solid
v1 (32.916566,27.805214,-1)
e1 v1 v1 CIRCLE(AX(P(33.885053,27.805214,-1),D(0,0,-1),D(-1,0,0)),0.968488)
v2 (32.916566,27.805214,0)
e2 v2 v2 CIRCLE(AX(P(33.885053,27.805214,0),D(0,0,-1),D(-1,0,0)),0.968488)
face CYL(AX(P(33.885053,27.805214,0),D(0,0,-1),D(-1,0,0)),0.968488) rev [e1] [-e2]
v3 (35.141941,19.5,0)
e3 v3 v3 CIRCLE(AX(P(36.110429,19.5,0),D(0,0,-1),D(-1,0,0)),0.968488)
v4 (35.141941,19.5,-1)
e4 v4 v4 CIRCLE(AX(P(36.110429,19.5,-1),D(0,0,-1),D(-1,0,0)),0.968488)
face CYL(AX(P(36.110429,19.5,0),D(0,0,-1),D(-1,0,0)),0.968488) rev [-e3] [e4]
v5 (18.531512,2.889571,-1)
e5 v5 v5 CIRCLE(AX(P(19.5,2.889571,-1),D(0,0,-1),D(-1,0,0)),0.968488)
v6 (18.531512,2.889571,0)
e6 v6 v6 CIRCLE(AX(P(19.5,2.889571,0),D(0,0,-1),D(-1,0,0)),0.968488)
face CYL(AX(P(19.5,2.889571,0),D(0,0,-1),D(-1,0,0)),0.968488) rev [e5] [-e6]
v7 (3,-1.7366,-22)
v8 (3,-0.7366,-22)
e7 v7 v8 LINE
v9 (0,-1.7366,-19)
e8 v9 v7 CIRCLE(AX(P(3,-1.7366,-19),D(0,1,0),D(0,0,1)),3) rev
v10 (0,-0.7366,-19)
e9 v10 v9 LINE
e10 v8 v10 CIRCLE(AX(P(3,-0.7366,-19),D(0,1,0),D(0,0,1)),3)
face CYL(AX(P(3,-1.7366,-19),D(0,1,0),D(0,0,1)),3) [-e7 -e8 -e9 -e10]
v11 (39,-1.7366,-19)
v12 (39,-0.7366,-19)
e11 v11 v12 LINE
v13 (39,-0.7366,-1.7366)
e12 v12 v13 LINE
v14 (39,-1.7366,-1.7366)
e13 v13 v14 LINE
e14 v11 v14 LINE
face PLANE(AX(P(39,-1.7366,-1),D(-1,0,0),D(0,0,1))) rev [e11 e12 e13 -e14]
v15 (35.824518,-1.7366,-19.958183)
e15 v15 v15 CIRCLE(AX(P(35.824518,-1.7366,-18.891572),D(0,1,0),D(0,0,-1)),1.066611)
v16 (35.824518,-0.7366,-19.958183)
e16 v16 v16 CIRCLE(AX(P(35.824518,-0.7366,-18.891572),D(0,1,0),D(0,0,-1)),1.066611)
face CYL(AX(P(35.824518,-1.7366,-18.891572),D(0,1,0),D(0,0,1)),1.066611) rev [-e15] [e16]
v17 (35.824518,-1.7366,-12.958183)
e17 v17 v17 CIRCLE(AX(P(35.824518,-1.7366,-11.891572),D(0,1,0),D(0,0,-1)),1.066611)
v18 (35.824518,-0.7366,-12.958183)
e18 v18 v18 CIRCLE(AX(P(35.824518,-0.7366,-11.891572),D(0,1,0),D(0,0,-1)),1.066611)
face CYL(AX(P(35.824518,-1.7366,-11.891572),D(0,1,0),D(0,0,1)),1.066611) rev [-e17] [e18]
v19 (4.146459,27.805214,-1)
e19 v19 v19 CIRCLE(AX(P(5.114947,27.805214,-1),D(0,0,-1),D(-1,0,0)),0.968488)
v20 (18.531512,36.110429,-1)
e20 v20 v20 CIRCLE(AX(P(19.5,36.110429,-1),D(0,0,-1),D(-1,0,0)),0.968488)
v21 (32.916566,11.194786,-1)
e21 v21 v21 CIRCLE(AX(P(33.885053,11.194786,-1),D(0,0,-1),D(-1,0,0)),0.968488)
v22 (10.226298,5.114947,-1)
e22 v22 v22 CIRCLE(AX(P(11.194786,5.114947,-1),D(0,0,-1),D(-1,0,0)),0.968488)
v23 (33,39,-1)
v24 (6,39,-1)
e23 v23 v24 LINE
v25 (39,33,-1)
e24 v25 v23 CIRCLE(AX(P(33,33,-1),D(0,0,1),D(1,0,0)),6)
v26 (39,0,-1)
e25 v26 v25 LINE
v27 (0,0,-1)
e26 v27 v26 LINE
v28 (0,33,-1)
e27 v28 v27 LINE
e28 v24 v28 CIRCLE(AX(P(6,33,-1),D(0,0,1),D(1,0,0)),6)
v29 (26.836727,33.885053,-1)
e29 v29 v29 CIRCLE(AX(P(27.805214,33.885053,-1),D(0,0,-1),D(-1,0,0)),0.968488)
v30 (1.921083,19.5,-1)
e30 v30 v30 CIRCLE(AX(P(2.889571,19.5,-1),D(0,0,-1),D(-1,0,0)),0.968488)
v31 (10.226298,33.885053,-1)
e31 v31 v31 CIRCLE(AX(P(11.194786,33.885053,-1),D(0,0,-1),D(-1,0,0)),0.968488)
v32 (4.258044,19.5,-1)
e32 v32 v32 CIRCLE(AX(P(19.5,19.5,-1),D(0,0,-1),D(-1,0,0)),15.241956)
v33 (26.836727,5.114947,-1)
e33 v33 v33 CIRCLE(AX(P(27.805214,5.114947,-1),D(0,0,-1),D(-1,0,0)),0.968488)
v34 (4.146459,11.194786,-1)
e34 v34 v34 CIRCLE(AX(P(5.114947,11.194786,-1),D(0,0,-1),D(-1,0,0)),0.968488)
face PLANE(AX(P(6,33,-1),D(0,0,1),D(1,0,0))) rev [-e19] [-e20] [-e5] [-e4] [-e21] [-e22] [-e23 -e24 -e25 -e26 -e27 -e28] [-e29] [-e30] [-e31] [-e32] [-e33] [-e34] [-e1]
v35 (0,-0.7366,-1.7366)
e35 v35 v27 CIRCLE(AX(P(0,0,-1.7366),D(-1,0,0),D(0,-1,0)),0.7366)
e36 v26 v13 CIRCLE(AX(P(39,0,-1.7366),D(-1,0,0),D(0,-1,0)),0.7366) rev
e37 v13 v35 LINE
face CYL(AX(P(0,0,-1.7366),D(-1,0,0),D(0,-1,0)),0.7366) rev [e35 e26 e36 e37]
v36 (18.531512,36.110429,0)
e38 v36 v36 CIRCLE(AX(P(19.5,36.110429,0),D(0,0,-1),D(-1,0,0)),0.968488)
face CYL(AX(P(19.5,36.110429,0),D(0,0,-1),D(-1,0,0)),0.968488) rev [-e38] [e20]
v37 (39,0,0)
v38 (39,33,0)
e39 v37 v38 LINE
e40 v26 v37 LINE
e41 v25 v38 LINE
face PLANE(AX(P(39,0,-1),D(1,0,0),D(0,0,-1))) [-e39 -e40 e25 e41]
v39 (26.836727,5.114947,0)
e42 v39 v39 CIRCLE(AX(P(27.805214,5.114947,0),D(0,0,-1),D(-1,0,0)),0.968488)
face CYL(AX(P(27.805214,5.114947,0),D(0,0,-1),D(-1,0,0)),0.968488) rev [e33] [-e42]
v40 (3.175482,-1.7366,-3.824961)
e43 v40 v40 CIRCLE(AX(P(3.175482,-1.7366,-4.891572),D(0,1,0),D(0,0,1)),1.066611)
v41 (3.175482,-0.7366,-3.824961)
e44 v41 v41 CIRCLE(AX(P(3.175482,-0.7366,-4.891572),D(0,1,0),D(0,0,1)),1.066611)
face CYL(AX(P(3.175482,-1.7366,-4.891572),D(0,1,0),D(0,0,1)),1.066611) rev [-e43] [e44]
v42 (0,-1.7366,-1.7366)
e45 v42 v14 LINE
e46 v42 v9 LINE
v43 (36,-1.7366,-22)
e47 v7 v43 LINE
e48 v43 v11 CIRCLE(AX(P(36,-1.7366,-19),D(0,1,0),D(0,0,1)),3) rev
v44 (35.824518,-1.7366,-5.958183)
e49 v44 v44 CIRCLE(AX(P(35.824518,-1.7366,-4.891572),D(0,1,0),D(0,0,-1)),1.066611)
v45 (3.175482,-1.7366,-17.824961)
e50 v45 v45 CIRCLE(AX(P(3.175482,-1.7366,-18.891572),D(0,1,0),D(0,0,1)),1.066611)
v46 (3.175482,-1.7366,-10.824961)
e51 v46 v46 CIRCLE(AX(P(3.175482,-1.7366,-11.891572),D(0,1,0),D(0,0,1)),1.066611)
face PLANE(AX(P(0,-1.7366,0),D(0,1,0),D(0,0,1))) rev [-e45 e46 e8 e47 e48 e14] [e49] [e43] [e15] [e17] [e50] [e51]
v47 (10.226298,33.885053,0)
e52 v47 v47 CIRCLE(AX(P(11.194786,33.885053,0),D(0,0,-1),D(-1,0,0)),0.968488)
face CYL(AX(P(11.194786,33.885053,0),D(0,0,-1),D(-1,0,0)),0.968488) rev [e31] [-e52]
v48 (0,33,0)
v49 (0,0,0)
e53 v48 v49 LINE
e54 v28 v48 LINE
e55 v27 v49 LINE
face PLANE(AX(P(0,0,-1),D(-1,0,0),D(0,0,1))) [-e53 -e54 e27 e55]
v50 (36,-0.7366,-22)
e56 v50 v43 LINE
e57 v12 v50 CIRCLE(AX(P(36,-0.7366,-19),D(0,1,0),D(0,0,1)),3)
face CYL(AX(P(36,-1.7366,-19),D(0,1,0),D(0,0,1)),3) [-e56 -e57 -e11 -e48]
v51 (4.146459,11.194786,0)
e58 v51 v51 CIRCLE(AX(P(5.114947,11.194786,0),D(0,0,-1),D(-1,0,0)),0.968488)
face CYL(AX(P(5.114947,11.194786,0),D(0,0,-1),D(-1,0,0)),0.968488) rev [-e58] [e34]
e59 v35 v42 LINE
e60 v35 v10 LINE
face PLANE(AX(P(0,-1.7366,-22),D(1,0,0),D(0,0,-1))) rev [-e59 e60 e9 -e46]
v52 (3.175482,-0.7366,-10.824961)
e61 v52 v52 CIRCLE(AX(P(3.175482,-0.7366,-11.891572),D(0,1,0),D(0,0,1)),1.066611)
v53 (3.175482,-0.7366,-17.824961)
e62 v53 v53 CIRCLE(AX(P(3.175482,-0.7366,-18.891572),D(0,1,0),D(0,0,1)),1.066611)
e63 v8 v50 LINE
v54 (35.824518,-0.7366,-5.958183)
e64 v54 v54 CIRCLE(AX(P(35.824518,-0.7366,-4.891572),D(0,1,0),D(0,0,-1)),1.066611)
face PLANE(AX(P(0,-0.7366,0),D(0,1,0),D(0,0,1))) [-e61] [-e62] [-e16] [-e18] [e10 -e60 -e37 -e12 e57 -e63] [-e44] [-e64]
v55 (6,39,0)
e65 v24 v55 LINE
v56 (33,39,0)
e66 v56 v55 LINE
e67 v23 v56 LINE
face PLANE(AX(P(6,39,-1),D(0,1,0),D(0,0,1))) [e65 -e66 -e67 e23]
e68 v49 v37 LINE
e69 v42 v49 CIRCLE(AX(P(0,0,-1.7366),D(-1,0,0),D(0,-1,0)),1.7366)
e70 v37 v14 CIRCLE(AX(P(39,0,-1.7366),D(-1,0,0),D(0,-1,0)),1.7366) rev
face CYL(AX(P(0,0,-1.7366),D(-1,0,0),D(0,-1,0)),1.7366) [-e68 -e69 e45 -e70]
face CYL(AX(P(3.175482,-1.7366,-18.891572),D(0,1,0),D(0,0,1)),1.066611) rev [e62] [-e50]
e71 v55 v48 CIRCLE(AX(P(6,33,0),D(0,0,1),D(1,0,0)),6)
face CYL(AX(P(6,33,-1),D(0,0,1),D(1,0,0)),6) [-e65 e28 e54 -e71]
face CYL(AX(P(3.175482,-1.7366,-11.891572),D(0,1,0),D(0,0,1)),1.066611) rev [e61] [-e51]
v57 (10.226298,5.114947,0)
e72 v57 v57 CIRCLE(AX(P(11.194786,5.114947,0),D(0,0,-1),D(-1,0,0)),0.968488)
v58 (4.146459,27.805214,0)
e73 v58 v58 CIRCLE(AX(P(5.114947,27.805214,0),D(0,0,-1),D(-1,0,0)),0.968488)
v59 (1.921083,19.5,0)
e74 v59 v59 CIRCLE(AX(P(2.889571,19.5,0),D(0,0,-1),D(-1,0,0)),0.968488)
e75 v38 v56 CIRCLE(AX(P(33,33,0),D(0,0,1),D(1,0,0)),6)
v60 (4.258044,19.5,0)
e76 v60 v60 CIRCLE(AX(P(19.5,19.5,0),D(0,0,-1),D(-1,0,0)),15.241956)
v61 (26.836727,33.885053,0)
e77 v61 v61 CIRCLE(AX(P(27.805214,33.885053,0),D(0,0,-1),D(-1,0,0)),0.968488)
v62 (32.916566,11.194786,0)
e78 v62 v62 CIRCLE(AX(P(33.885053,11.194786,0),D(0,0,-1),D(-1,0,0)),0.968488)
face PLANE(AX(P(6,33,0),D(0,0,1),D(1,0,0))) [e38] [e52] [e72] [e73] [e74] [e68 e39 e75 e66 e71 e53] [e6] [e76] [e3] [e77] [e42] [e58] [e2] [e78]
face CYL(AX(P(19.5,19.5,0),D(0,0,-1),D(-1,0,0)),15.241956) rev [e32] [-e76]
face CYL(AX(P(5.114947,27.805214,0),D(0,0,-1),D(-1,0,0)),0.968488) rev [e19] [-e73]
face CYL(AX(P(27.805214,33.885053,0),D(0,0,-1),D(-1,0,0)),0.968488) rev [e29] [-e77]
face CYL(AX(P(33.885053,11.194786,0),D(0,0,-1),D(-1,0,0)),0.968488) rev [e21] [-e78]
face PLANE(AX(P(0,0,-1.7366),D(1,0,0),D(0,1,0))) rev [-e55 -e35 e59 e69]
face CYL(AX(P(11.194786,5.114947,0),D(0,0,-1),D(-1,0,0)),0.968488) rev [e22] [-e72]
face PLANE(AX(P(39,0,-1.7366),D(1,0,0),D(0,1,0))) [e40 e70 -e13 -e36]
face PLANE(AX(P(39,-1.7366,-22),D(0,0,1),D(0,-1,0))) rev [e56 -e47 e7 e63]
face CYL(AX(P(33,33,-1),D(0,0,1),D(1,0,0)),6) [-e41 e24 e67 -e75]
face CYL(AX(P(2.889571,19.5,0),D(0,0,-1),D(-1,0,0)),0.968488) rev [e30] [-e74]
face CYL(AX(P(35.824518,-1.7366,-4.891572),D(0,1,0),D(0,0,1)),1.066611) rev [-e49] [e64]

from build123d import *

# Parameters (mm, degrees)
BASE_FLANGE1_DEPTH = 1
EDGE_FLANGE1_DEPTH = 39
FILLET1_R          = 3
SKETCH12_R         = 15.241955925
SKETCH12_R_2       = 0.968487673
CUT_EXTRUDE1_DEPTH = 1
SKETCH13_R         = 1.066611422
CUT_EXTRUDE2_DEPTH = 1


# Sheet-metal steps are written as plain solids
with BuildPart() as part:
    # Sketch2 → Base-Flange1 (new body)
    with BuildSketch(Plane.XY):
        with BuildLine():
            Line((0, 0), (39, 0))
            Line((39, 0), (39, 33))
            ThreePointArc((39, 33), (37.242640687, 37.242640687), (33, 39))
            Line((33, 39), (6, 39))
            ThreePointArc((6, 39), (1.757359313, 37.242640687), (0, 33))
            Line((0, 33), (0, 0))
        make_face()
    extrude(amount=-BASE_FLANGE1_DEPTH)

    # Edge-Flange1 section (across the edge) → Edge-Flange1 (add)
    with BuildSketch(Plane(origin=(39, -0.7366, -1), x_dir=(0, 1, 0), z_dir=(-1, 0, 0))):
        with BuildLine():
            Line((-1, 0.7366), (-1, 21))
            Line((-1, 21), (0, 21))
            Line((0, 21), (0, 0.7366))
            ThreePointArc((0, 0.7366), (0.215745145, 0.215745145), (0.7366, 0))
            Line((0.7366, 0), (0.7366, -1))
            ThreePointArc((0.7366, -1), (-0.491361636, -0.491361636), (-1, 0.7366))
        make_face()
    extrude(amount=EDGE_FLANGE1_DEPTH)

    # Fillet1
    fillet1_edges = [part.edges().sort_by_distance(p)[0] for p in [
        (39, -1.2366, -22),
        (0, -1.2366, -22),
    ]]
    fillet(fillet1_edges, radius=FILLET1_R)

    # Sketch12 → Cut-Extrude1 (cut)
    with BuildSketch(Plane(origin=(0, 0, -1), x_dir=(-1, 0, 0), z_dir=(0, 0, -1))):
        with Locations((-19.5, 19.5)):
            Circle(SKETCH12_R)
        with Locations((-19.5, 36.110428889)):
            Circle(SKETCH12_R_2)
        with Locations((-27.805214445, 33.885053386)):
            Circle(SKETCH12_R_2)
        with Locations((-33.885053386, 27.805214445)):
            Circle(SKETCH12_R_2)
        with Locations((-36.110428889, 19.5)):
            Circle(SKETCH12_R_2)
        with Locations((-33.885053386, 11.194785555)):
            Circle(SKETCH12_R_2)
        with Locations((-27.805214445, 5.114946614)):
            Circle(SKETCH12_R_2)
        with Locations((-19.5, 2.889571111)):
            Circle(SKETCH12_R_2)
        with Locations((-11.194785555, 5.114946614)):
            Circle(SKETCH12_R_2)
        with Locations((-5.114946614, 11.194785555)):
            Circle(SKETCH12_R_2)
        with Locations((-2.889571111, 19.5)):
            Circle(SKETCH12_R_2)
        with Locations((-5.114946614, 27.805214445)):
            Circle(SKETCH12_R_2)
        with Locations((-11.194785555, 33.885053386)):
            Circle(SKETCH12_R_2)
    extrude(amount=-CUT_EXTRUDE1_DEPTH, mode=Mode.SUBTRACT)

    # Sketch13 → Cut-Extrude2 (cut)
    with BuildSketch(Plane(origin=(0, -0.7366, 0), x_dir=(1, 0, 0), z_dir=(0, 1, 0))):
        with Locations(Location((3.175481607, 18.89157203, 0), (0, 0, 270))):
            Circle(SKETCH13_R)
        with Locations(Location((3.175481607, 11.89157203, 0), (0, 0, 270))):
            Circle(SKETCH13_R)
        with Locations(Location((3.175481607, 4.89157203, 0), (0, 0, 270))):
            Circle(SKETCH13_R)
        with Locations(Location((35.824518393, 4.89157203, 0), (0, 0, 90))):
            Circle(SKETCH13_R)
        with Locations(Location((35.824518393, 11.89157203, 0), (0, 0, 90))):
            Circle(SKETCH13_R)
        with Locations(Location((35.824518393, 18.89157203, 0), (0, 0, 90))):
            Circle(SKETCH13_R)
    extrude(amount=-CUT_EXTRUDE2_DEPTH, mode=Mode.SUBTRACT)


solid = part.part
